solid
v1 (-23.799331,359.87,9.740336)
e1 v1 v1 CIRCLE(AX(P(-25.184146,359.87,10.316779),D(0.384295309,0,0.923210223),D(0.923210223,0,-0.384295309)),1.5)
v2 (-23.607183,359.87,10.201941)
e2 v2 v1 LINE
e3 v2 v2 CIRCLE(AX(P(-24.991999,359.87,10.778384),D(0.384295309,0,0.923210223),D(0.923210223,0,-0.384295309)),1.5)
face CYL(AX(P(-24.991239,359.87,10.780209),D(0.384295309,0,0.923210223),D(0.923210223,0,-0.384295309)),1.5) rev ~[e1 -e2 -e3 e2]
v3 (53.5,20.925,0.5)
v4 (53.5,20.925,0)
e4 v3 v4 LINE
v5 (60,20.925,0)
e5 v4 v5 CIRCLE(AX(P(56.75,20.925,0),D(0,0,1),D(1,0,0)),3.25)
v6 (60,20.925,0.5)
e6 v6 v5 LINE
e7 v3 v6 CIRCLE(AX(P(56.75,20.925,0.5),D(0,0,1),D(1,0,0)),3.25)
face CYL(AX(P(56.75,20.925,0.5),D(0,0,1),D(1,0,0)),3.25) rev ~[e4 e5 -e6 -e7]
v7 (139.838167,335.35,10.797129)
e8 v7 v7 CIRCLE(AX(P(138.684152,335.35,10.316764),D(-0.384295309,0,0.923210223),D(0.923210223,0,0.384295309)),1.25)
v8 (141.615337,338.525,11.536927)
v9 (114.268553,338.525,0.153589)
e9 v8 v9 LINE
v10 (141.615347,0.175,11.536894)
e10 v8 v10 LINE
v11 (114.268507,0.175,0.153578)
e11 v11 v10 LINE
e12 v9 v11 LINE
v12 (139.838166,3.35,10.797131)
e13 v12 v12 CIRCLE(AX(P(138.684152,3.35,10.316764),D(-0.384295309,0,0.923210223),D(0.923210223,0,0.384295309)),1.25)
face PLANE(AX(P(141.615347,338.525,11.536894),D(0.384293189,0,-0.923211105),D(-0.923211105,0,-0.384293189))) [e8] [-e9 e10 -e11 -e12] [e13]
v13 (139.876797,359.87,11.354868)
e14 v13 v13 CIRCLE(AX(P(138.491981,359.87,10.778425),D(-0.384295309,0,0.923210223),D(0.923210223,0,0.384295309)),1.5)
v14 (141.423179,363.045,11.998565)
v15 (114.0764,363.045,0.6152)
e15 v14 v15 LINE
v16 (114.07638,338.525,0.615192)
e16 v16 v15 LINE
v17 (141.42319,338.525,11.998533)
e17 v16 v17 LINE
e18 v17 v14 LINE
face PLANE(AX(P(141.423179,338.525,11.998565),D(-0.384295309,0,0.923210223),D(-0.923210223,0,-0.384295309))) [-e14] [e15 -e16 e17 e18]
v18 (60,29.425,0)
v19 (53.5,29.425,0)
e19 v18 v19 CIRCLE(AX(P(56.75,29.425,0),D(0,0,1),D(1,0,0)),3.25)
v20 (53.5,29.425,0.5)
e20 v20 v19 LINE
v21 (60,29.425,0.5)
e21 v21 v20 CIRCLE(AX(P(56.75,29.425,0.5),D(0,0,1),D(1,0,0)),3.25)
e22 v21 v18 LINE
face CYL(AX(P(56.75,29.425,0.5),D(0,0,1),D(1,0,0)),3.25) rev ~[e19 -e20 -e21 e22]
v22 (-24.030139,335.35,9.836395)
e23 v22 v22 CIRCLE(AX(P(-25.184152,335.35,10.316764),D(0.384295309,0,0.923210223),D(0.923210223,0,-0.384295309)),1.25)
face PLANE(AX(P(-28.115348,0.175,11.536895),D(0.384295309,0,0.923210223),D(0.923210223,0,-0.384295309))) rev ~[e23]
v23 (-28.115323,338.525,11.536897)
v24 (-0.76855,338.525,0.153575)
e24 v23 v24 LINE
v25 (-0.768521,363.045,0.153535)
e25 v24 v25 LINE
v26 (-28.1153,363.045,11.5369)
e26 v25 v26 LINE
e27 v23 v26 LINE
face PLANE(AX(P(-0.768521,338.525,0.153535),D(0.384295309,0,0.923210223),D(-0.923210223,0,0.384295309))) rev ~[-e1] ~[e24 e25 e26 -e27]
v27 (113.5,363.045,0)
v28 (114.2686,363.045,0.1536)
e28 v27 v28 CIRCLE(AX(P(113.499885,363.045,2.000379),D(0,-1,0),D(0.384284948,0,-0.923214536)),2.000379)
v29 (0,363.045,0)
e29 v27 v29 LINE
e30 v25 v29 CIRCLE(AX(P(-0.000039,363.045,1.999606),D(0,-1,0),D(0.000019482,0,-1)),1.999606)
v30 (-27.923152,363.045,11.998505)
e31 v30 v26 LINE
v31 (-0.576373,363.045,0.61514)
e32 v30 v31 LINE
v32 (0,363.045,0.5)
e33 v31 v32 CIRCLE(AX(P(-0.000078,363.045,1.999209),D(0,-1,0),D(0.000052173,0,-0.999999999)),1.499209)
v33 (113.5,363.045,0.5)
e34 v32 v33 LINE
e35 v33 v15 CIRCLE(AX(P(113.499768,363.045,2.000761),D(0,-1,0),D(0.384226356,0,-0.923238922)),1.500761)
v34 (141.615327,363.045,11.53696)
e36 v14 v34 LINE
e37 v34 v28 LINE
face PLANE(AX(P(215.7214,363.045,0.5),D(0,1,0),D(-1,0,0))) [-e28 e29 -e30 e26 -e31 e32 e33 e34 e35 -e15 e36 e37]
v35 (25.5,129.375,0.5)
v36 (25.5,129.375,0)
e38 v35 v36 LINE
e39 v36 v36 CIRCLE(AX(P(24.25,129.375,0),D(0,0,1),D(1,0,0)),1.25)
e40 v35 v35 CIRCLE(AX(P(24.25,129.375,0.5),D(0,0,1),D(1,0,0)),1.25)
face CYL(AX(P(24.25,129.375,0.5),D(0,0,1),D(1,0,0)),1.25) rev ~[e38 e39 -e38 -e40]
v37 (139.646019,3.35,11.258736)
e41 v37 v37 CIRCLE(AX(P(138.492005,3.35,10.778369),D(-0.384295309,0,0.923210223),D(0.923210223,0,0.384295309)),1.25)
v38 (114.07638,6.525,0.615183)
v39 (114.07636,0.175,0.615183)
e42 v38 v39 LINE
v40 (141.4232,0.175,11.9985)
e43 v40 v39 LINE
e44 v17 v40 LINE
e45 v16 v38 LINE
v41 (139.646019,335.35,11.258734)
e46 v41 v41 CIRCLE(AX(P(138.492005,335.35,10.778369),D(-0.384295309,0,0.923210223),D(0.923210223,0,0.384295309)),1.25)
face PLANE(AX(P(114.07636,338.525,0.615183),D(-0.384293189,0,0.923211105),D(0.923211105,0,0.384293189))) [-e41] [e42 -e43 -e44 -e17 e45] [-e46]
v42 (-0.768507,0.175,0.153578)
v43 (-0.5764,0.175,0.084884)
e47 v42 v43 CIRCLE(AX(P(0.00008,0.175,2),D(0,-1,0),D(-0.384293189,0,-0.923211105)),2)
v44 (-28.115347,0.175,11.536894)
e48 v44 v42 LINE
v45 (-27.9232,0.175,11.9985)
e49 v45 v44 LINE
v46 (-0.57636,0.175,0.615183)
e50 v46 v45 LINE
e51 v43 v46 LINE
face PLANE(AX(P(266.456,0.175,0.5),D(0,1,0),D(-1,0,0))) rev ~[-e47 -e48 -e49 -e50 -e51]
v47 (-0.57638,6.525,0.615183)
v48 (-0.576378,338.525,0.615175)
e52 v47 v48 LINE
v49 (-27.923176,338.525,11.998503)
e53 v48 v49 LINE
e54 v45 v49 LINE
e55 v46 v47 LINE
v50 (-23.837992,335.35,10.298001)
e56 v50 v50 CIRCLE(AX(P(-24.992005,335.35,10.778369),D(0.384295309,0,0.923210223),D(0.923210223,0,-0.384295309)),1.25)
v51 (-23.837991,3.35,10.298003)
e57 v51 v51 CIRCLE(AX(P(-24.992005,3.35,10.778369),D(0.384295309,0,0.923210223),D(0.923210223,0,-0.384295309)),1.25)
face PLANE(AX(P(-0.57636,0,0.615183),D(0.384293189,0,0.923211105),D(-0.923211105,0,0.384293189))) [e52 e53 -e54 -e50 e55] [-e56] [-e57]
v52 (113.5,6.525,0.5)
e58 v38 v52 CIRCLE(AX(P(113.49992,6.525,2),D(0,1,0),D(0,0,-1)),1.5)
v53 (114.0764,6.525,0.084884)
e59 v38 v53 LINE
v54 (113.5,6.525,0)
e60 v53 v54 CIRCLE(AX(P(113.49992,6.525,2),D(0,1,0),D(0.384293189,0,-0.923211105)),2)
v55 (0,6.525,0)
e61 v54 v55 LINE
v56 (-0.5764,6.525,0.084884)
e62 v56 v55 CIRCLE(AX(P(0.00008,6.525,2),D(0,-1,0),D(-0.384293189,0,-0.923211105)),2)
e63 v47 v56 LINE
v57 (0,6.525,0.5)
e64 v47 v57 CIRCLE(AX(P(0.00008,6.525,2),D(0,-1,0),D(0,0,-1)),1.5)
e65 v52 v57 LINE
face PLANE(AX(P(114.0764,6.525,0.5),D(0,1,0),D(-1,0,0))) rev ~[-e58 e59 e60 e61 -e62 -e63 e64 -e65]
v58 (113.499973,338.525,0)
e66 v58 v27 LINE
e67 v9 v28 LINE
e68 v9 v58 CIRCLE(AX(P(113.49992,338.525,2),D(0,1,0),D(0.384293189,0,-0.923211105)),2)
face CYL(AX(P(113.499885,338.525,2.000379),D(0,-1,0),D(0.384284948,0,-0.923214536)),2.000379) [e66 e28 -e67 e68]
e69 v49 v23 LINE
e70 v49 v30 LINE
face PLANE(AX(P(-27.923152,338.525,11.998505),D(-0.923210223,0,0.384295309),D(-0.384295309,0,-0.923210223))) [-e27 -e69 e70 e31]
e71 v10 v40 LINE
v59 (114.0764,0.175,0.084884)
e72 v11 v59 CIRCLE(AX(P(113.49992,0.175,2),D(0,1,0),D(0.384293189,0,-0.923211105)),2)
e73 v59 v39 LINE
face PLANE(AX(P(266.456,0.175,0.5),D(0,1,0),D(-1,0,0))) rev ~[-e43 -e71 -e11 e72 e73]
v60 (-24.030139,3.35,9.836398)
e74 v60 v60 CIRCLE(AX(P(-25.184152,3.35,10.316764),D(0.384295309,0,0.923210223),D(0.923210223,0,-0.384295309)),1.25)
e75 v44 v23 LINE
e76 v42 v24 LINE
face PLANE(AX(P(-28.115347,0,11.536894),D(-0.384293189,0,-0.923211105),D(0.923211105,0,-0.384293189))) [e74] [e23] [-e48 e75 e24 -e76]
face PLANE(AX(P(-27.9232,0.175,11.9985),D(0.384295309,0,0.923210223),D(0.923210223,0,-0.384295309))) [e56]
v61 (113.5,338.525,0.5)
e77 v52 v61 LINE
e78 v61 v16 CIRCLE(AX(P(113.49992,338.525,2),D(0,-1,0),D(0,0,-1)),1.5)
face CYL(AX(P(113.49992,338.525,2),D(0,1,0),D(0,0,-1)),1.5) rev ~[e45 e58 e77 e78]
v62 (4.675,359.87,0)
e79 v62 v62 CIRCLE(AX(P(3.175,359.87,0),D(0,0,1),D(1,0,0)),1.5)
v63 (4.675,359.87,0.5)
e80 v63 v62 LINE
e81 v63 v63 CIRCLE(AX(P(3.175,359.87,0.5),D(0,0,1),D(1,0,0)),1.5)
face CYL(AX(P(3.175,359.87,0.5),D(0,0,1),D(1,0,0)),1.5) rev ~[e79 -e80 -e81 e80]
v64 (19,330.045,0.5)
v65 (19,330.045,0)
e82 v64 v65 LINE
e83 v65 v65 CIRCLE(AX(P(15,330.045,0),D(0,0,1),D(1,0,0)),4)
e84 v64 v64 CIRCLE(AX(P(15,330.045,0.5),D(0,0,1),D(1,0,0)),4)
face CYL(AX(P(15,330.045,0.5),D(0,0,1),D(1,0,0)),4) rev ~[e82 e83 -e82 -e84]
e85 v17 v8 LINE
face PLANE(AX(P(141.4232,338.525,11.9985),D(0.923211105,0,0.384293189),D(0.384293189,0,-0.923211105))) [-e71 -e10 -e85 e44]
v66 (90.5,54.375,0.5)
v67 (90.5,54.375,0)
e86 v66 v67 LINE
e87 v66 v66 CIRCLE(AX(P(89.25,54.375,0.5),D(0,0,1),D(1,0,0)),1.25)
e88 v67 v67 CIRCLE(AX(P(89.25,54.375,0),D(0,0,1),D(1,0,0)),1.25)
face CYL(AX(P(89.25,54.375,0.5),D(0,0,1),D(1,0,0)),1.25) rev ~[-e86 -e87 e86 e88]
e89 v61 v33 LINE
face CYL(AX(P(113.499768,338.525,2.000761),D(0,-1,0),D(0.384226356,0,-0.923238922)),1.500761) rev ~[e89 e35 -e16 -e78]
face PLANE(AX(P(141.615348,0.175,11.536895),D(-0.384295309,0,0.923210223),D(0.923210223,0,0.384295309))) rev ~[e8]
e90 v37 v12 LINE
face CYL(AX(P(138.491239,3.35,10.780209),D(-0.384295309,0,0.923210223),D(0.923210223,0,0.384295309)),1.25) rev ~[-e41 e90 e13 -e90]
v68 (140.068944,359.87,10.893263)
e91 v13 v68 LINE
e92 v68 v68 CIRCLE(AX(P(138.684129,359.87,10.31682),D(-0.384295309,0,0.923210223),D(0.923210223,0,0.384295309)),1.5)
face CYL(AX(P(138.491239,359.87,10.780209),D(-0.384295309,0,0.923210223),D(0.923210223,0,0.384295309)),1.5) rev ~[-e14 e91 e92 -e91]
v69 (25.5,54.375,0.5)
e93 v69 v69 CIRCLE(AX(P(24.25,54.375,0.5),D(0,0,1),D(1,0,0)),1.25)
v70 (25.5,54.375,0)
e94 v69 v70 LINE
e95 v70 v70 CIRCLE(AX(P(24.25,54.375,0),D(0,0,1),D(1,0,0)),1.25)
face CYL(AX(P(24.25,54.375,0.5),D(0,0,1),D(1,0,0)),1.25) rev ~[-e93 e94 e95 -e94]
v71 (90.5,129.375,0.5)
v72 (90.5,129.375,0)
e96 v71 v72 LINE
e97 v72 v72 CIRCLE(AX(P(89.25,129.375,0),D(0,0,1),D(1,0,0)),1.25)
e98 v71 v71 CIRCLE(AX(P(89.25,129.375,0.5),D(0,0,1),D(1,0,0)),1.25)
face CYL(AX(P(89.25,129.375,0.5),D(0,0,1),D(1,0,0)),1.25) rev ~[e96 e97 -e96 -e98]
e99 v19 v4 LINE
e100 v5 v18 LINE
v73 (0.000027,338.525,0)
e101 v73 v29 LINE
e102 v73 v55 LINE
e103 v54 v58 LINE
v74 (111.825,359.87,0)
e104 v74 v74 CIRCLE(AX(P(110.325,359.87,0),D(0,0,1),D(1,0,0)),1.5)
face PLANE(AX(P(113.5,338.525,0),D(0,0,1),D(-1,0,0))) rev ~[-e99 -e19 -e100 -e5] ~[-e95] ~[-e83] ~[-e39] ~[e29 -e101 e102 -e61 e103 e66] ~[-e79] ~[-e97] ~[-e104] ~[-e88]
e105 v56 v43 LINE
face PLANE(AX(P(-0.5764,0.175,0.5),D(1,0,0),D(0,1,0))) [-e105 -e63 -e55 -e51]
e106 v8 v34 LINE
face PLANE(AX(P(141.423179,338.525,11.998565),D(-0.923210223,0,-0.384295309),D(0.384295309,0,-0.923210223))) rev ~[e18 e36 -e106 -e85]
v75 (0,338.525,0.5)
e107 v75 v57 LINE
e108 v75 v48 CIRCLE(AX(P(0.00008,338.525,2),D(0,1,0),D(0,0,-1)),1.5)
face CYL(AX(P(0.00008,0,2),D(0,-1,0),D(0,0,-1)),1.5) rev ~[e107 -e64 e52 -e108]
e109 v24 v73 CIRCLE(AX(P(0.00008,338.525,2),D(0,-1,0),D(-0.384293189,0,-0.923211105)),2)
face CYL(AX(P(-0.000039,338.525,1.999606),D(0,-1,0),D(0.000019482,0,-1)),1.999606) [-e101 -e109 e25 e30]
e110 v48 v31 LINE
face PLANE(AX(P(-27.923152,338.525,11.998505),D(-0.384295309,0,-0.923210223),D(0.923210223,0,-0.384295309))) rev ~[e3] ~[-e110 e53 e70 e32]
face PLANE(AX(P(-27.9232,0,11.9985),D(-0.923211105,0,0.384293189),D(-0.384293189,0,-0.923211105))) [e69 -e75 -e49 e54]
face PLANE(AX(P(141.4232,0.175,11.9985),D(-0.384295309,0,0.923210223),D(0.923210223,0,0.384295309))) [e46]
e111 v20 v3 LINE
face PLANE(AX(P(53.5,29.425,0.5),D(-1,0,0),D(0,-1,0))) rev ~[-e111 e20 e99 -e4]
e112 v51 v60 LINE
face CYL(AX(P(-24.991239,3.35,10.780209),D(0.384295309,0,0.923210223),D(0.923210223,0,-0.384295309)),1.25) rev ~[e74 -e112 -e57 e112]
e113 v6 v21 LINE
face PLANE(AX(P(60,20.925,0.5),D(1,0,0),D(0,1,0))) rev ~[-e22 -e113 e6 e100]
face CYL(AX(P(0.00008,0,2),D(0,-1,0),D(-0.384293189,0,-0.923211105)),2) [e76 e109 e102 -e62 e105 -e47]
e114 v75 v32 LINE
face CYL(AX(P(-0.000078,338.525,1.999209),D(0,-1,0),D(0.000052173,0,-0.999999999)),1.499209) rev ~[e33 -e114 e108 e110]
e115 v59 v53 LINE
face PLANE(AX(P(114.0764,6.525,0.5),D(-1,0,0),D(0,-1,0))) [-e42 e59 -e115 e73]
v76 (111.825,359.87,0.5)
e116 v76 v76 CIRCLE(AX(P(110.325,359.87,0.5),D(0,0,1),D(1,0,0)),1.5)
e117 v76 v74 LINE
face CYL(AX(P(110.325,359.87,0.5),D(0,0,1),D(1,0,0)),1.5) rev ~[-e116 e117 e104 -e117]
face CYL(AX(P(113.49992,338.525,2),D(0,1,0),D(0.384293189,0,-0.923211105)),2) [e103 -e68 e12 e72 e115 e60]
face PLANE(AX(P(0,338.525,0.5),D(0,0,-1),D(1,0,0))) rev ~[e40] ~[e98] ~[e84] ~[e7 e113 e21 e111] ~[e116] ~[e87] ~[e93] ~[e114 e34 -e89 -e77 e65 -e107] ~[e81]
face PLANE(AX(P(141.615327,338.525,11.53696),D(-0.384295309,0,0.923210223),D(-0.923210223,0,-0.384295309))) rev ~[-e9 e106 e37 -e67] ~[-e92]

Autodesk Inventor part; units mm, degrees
ref_plane "YZ Plane" through (0, 0, 0) normal (1, 0, 0) x (0, 1, 0)
ref_plane "XZ Plane" through (0, 0, 0) normal (0, 1, 0) x (-1, 0, 0)
ref_plane "XY Plane" through (0, 0, 0) normal (0, 0, 1) x (1, 0, 0)
sketch "Sketch1" plane through (0, 0, 0) normal (0, 0, 1) x (1, 0, 0)
  line L0 (0, 0) -> (113.5, 0)
  line L1 (113.5, 0) -> (113.5, 338.525)
  line L2 (113.5, 338.525) -> (0, 338.525)
  line L3 (0, 338.525) -> (0, 0)
  dimension "d0" = 113.5
  dimension "d1" = 338.525
extrude "Plate1" add sketch "Sketch1" along normal blind 0.5
sketch "Sketch2" plane through (114.0764, 338.525, 0.6152) normal (0.3842953, 0, -0.9232102) x (0, 1, 0)
  line L0 (-338.525, 0) -> (0, 0)
  line L1 (0, 0) -> (0, 29.6214)
  line L2 (0, 29.6214) -> (-338.525, 29.6214)
  line L3 (-338.525, 29.6214) -> (-338.525, 0)
edge flange "Flange1" height 30.021 angle 22.6 thickness 0.5 bend radius 1.5 thickness toward (0.3842953, 0, -0.9232102) relief tear relief width 0.5 relief depth 0.25 edges at (113.5, 169.2625, 0.5) wall of the first edge with corners at (114.0764, 0, 0.6152) (114.0764, 338.525, 0.6152) (141.4232, 338.525, 11.9985) (141.4232, 0, 11.9985)
bend "Bend1"
corner "Corner1"
sketch "Sketch3" plane through (-0.5764, 0, 0.6152) normal (-0.3842953, 0, -0.9232102) x (0, -1, 0)
  line L0 (-338.525, 0) -> (0, 0)
  line L1 (0, 0) -> (0, 29.6214)
  line L2 (0, 29.6214) -> (-338.525, 29.6214)
  line L3 (-338.525, 29.6214) -> (-338.525, 0)
edge flange "Flange2" height 30.021 angle 22.6 thickness 0.5 bend radius 1.5 thickness toward (-0.3842953, 0, -0.9232102) relief tear relief width 0.5 relief depth 0.25 edges at (0, 169.2625, 0.5) wall of the first edge with corners at (-0.5764, 338.525, 0.6152) (-0.5764, 0, 0.6152) (-27.9232, 0, 11.9985) (-27.9232, 338.525, 11.9985)
bend "Bend2"
corner "Corner2"
sketch "Sketch4" plane through (-27.9232, 0, 11.9985) normal (0.3842953, 0, 0.9232102) x (0.9232102, 0, -0.3842953)
  line L0 (0, 338.525) -> (0, 0) projected
  line L1 (0, 338.525) -> (0, 335.35) construction
  line L2 (0, 335.35) -> (3.175, 335.35) construction
  circle A0 centre (3.175, 335.35) radius 1.25
  line L3 (0, 0) -> (0, 3.175) construction
  line L4 (0, 3.175) -> (3.175, 3.175) construction
  line L5 (3.175, 3.175) -> (3.175, 3.35) construction
  circle A1 centre (3.175, 3.35) radius 1.25
  point P0 (30.39, 0)
  dimension "d23" = 3.175
  dimension "d24" = 3.175
  dimension "d25" = 2.5
  dimension "d26" = 3.175
  dimension "d27" = 3.175
  dimension "d62" = 0.175
  dimension "d63" = 2.5
extrude "Extrusion1" cut sketch "Sketch4" against normal blind 10
sketch "Sketch5" plane through (0, 0, 0.5) normal (0, 0, 1) x (1, 0, 0)
  line L0 (0, 0) -> (0, 338.525) projected
  line L1 (113.5, 0) -> (0, 0) projected
  line L2 (113.5, 338.525) -> (113.5, 0) projected
  line L3 (0, 338.525) -> (0, 335.35) construction
  line L4 (0, 335.35) -> (3.175, 335.35) construction
  line L5 (113.5, 338.525) -> (113.5, 335.35) construction
  line L6 (113.5, 335.35) -> (110.325, 335.35) construction
  line L7 (0, 0) -> (3.175, 0) construction
  line L8 (0, 0) -> (113.5, 0) construction
  line L9 (3.175, 0) -> (3.175, 3.175) construction
  line L10 (113.5, 0) -> (113.5, 3.175) construction
  line L11 (113.5, 3.175) -> (110.325, 3.175) construction
  circle A0 centre (3.175, 335.35) radius 1.25
  circle A1 centre (110.325, 335.35) radius 1.25
  line L12 (3.175, 3.175) -> (3.175, 3.35) construction
  line L13 (110.325, 3.175) -> (110.325, 3.35) construction
  circle A2 centre (110.325, 3.35) radius 1.25
  circle A3 centre (3.175, 3.35) radius 1.25
  dimension "d31" = 3.175
  dimension "d32" = 3.175
  dimension "d33" = 3.175
  dimension "d34" = 3.175
  dimension "d35" = 3.175
  dimension "d36" = 3.175
  dimension "d37" = 3.175
  dimension "d38" = 3.175
  dimension "d41" = 2.5
  dimension "d42" = 2.5
  dimension "d58" = 0.175
  dimension "d59" = 0.175
  dimension "d60" = 2.5
  dimension "d61" = 2.5
extrude "Extrusion2" cut sketch "Sketch5" against normal blind 10
sketch "Sketch6" plane through (141.4232, 0, 11.9985) normal (-0.3842953, 0, 0.9232102) x (0.9232102, 0, 0.3842953)
  line L0 (0, 338.525) -> (0, 335.35) construction
  line L1 (0, 0) -> (0, 338.525) construction
  line L2 (0, 335.35) -> (-3.175, 335.35) construction
  line L3 (0, 0) -> (0, 3.175) construction
  line L4 (0, 3.175) -> (-3.175, 3.175) construction
  circle A0 centre (-3.175, 335.35) radius 1.25
  line L5 (-3.175, 3.175) -> (-3.175, 3.35) construction
  circle A1 centre (-3.175, 3.35) radius 1.25
  point P0 (-135.1743, 0)
  dimension "d45" = 3.175
  dimension "d46" = 3.175
  dimension "d47" = 3.175
  dimension "d48" = 3.175
  dimension "d50" = 2.5
  dimension "d64" = 0.175
  dimension "d65" = 2.5
extrude "Extrusion3" cut sketch "Sketch6" against normal blind 10
sketch "Sketch7" plane through (0, 0, 0.5) normal (0, 0, 1) x (1, 0, 0)
  line L0 (-71.3896, 0) -> (266.456, 0)
  line L1 (266.456, 0) -> (266.456, 0.175)
  line L2 (266.456, 0.175) -> (-71.3896, 0.175)
  line L3 (-71.3896, 0.175) -> (-71.3896, 0)
  dimension "d53" = 0.175
extrude "Extrusion4" cut sketch "Sketch7" against normal blind 100 and the other way blind 100
sketch "Sketch9" plane through (0, 0, 0.5) normal (0, 0, 1) x (1, 0, 0)
  circle A0 centre (3.175, 3.35) radius 1.25 projected
  circle A1 centre (110.325, 3.35) radius 1.25 projected
  line L0 (-0.5764, 0.175) -> (-0.5764, 338.525) projected
  line L1 (114.0764, 338.525) -> (114.0764, 0.175) projected
  line L2 (-0.5764, 0.175) -> (114.0764, 0.175)
  line L3 (114.0764, 0.175) -> (114.0764, 6.525)
  line L4 (114.0764, 6.525) -> (-0.5764, 6.525)
  line L5 (-0.5764, 6.525) -> (-0.5764, 0.175)
  point P0 (0, 0)
  dimension "d66" = 6.35
extrude "Extrusion5" cut sketch "Sketch9" against normal blind 10 and the other way blind 5
sketch "Sketch10" plane through (0, 0, 0.5) normal (0, 0, 1) x (1, 0, 0)
  line L0 (0, 6.525) -> (0, 338.525) projected
  line L1 (0, 6.525) -> (0, 54.375) construction
  line L2 (0, 54.375) -> (24.25, 54.375) construction
  circle A0 centre (24.25, 54.375) radius 1.25
  line L3 (24.25, 54.375) -> (89.25, 54.375) construction
  circle A1 centre (89.25, 54.375) radius 1.25
  line L4 (24.25, 54.375) -> (24.25, 129.375) construction
  circle A2 centre (24.25, 129.375) radius 1.25
  line L5 (24.25, 129.375) -> (89.25, 129.375) construction
  circle A3 centre (89.25, 129.375) radius 1.25
  point P0 (0, 0)
  dimension "d71" = 47.85
  dimension "d72" = 24.25
  dimension "d73" = 2.5
  dimension "d74" = 65
  dimension "d75" = 2.5
  dimension "d76" = 75
  dimension "d77" = 2.5
  dimension "d78" = 65
  dimension "d79" = 2.5
extrude "Extrusion6" cut sketch "Sketch10" against normal blind 10
sketch "Sketch11" plane through (0, 0, 0.5) normal (0, 0, 1) x (1, 0, 0)
  circle A0 centre (24.25, 54.375) radius 1.25 projected
  line L0 (24.25, 54.375) -> (24.25, 29.425) construction
  line L1 (24.25, 29.425) -> (56.75, 29.425) construction
  line L2 (56.75, 29.425) -> (60, 29.425) construction
  line L3 (60, 29.425) -> (53.5, 29.425)
  line L4 (53.5, 29.425) -> (53.5, 20.925)
  line L5 (53.5, 20.925) -> (60, 20.925)
  line L6 (60, 20.925) -> (60, 29.425)
  circle A1 centre (56.75, 29.425) radius 3.25
  circle A2 centre (56.75, 20.925) radius 3.25
  point P0 (0, 0)
  dimension "d82" = 24.95
  dimension "d83" = 32.5
  dimension "d84" = 3.25
  dimension "d85" = 6.5
  dimension "d86" = 8.5
extrude "Extrusion7" cut sketch "Sketch11" against normal blind 10 contours A1 L3 | L3 A1 | L6 A2 L4 A1 | A2 L5 | L5 A2
sketch "Sketch13" plane through (0, 338.525, 0) normal (0, 1, 0) x (1, 0, 0)
  line L0 (0, -0.5) -> (113.5, -0.5) projected
  line L1 (113.5, 0) -> (113.5, -0.5) projected
  line L2 (113.5, 0) -> (0, 0) projected
  line L3 (0, 0) -> (0, -0.5) projected
extrude "Extrusion8" add sketch "Sketch13" along normal blind 30.87
sketch "Sketch14" plane through (-28.1153, 338.525, 11.5369) normal (0, 1, 0) x (0.9232102, 0, -0.3842953)
  line L0 (29.6214, -0.5) -> (29.6214, 0) projected
  line L1 (29.6214, 0) -> (0, 0) projected
  line L2 (0, -0.5) -> (0, 0) projected
  line L3 (0, -0.5) -> (29.6214, -0.5) projected
  point P0 (30.39, -0.1536)
extrude "Extrusion9" add sketch "Sketch14" along normal blind 30.87
sketch "Sketch15" plane through (0, 338.525, 0.5) normal (0, 1, 0) x (1, 0, 0)
  line L0 (-0.5764, -0.1152) -> (-0.7686, 0.3464) projected
  arc A0 (0, 0) -> (-0.5764, -0.1152) centre (0, -1.5) ccw projected
  line L1 (0, 0.5) -> (0, 0) projected
  arc A1 (0, 0.5) -> (-0.7686, 0.3464) centre (0, -1.5) ccw projected
extrude "Extrusion10" add sketch "Sketch15" along normal blind 30.87
sketch "Sketch16" plane through (113.5, 338.525, 0.5) normal (0, 1, 0) x (1, 0, 0)
  line L0 (0.7686, 0.3464) -> (0.5764, -0.1152) projected
  arc A0 (0.7686, 0.3464) -> (0, 0.5) centre (0, -1.5) ccw projected
  line L1 (0, 0.5) -> (0, 0) projected
  arc A1 (0.5764, -0.1152) -> (0, 0) centre (0, -1.5) ccw projected
  point P0 (-113.5, 0.5)
extrude "Extrusion11" add sketch "Sketch16" along normal blind 30.87
sketch "Sketch17" plane through (114.0764, 338.525, 0.6152) normal (0, 1, 0) x (0.9232102, 0, 0.3842953)
  line L0 (0, 0.5) -> (0, 0) projected
  line L1 (29.6214, 0) -> (0, 0) projected
  line L2 (29.6214, 0) -> (29.6214, 0.5) projected
  line L3 (29.6214, 0.5) -> (0, 0.5) projected
  point P0 (-105.553, -43.2711)
extrude "Extrusion12" add sketch "Sketch17" along normal blind 30.87
sketch "Sketch18" plane through (-27.9232, 0.175, 11.9985) normal (0.3842953, 0, 0.9232102) x (0.9232102, 0, -0.3842953)
  circle A0 centre (3.175, 335.175) radius 1.25 projected
  circle A1 centre (3.175, 335.175) radius 1.25
  point P0 (30.39, -0.175)
  dimension "d100" = 2.5
extrude "Extrusion13" add sketch "Sketch18" against normal up to surface (0.5 mm away)
sketch "Sketch19" plane through (0, 0, 0.5) normal (0, 0, 1) x (1, 0, 0)
  circle A0 centre (110.325, 335.35) radius 1.25 projected
  circle A1 centre (3.175, 335.35) radius 1.25 projected
  point P0 (0, 0)
extrude "Extrusion14" add sketch "Sketch19" against normal up to surface (0.5 mm away)
sketch "Sketch20" plane through (141.4232, 0.175, 11.9985) normal (-0.3842953, 0, 0.9232102) x (0.9232102, 0, 0.3842953)
  circle A0 centre (-3.175, 335.175) radius 1.25 projected
  circle A1 centre (-3.175, 335.175) radius 1.25
  point P0 (-135.1743, -0.175)
extrude "Extrusion15" add sketch "Sketch20" against normal up to surface (0.5 mm away)
sketch "Sketch21" plane through (-27.9232, 0.175, 11.9985) normal (0.3842953, 0, 0.9232102) x (0.9232102, 0, -0.3842953)
  line L0 (0, 369.22) -> (0, 359.695) construction
  line L1 (0, 0) -> (0, 369.22) construction
  line L2 (0, 359.695) -> (3.175, 359.695) construction
  circle A0 centre (3.175, 359.695) radius 1.5
  point P0 (30.39, -0.175)
  dimension "d107" = 9.525
  dimension "d108" = 3.175
  dimension "d109" = 3
extrude "Extrusion16" cut sketch "Sketch21" against normal blind 30.87
sketch "Sketch22" plane through (0, 0, 0.5) normal (0, 0, 1) x (1, 0, 0)
  line L0 (113.5, 6.525) -> (113.5, 369.395) projected
  line L1 (0, 369.395) -> (0, 359.87) construction
  line L2 (0, 6.525) -> (0, 369.395) construction
  line L3 (0, 359.87) -> (3.175, 359.87) construction
  circle A0 centre (3.175, 359.87) radius 1.5
  line L4 (113.5, 6.525) -> (113.5, 369.395) construction
  line L5 (113.5, 369.395) -> (113.5, 359.87) construction
  line L6 (113.5, 359.87) -> (110.325, 359.87) construction
  circle A1 centre (110.325, 359.87) radius 1.5
  point P0 (0, 0)
  dimension "d112" = 9.525
  dimension "d113" = 3.175
  dimension "d114" = 3
  dimension "d115" = 9.525
  dimension "d116" = 3.175
  dimension "d117" = 3
extrude "Extrusion17" cut sketch "Sketch22" against normal blind 30.87
sketch "Sketch23" plane through (141.4232, 0.175, 11.9985) normal (-0.3842953, 0, 0.9232102) x (0.9232102, 0, 0.3842953)
  line L0 (0, 0) -> (0, 369.22) projected
  line L1 (0, 369.22) -> (0, 359.695) construction
  line L2 (0, 359.695) -> (-3.175, 359.695) construction
  circle A0 centre (-3.175, 359.695) radius 1.5
  point P0 (-135.1743, -0.175)
  dimension "d120" = 9.525
  dimension "d121" = 3.175
  dimension "d122" = 3
extrude "Extrusion18" cut sketch "Sketch23" against normal blind 30.87
sketch "Sketch24" plane through (0, 0, 0.5) normal (0, 0, 1) x (1, 0, 0)
  line L0 (-33.1091, 369.395) -> (215.7214, 369.395)
  line L1 (215.7214, 369.395) -> (215.7214, 363.045)
  line L2 (215.7214, 363.045) -> (-33.1091, 363.045)
  line L3 (-33.1091, 363.045) -> (-33.1091, 369.395)
  point P0 (0, 0)
  dimension "d125" = 6.35
extrude "Extrusion19" cut sketch "Sketch24" against normal blind 30.87 and the other way blind 15.435
sketch "Sketch25" plane through (0, 0, 0.5) normal (0, 0, 1) x (1, 0, 0)
  line L0 (0, 363.045) -> (0, 330.045) construction
  line L1 (0, 6.525) -> (0, 363.045) construction
  line L2 (0, 330.045) -> (15, 330.045) construction
  circle A0 centre (15, 330.045) radius 4
  point P0 (0, 0)
  dimension "d130" = 33
  dimension "d131" = 15
  dimension "d132" = 8
extrude "Extrusion20" cut sketch "Sketch25" against normal blind 10
equation "\"d2\" = Thickness"
equation "\"d3\" = BendReliefWidth"
equation "\"d4\" = BendReliefDepth"
equation "\"d5\" = MinimumRemnant"
equation "\"d6\" = TransitionRadius"
equation "\"d10\" = CornerReliefSize"
equation "\"d11\" = GapSize"
equation "\"d12\" = JacobiRadiusSize"
equation "\"d13\" = BendReliefWidth"
equation "\"d14\" = BendReliefDepth"
equation "\"d15\" = MinimumRemnant"
equation "\"d16\" = TransitionRadius"
equation "\"d20\" = CornerReliefSize"
equation "\"d21\" = GapSize"
equation "\"d22\" = JacobiRadiusSize"
equation "\"BendRadius\" = Thickness"
equation "\"BendReliefWidth\" = Thickness"
equation "\"BendReliefDepth\" = 0.5 * Thickness"
equation "\"CornerReliefSize\" = 4 * Thickness"
equation "\"MinimumRemnant\" = 2 * Thickness"
equation "\"TransitionRadius\" = BendRadius"
equation "\"JacobiRadiusSize\" = BendRadius"
equation "\"GapSize\" = Thickness"
equation "\"Thickness\" = 0.5"
properties part number "sideplate part 4" material "Aluminum 6061"
